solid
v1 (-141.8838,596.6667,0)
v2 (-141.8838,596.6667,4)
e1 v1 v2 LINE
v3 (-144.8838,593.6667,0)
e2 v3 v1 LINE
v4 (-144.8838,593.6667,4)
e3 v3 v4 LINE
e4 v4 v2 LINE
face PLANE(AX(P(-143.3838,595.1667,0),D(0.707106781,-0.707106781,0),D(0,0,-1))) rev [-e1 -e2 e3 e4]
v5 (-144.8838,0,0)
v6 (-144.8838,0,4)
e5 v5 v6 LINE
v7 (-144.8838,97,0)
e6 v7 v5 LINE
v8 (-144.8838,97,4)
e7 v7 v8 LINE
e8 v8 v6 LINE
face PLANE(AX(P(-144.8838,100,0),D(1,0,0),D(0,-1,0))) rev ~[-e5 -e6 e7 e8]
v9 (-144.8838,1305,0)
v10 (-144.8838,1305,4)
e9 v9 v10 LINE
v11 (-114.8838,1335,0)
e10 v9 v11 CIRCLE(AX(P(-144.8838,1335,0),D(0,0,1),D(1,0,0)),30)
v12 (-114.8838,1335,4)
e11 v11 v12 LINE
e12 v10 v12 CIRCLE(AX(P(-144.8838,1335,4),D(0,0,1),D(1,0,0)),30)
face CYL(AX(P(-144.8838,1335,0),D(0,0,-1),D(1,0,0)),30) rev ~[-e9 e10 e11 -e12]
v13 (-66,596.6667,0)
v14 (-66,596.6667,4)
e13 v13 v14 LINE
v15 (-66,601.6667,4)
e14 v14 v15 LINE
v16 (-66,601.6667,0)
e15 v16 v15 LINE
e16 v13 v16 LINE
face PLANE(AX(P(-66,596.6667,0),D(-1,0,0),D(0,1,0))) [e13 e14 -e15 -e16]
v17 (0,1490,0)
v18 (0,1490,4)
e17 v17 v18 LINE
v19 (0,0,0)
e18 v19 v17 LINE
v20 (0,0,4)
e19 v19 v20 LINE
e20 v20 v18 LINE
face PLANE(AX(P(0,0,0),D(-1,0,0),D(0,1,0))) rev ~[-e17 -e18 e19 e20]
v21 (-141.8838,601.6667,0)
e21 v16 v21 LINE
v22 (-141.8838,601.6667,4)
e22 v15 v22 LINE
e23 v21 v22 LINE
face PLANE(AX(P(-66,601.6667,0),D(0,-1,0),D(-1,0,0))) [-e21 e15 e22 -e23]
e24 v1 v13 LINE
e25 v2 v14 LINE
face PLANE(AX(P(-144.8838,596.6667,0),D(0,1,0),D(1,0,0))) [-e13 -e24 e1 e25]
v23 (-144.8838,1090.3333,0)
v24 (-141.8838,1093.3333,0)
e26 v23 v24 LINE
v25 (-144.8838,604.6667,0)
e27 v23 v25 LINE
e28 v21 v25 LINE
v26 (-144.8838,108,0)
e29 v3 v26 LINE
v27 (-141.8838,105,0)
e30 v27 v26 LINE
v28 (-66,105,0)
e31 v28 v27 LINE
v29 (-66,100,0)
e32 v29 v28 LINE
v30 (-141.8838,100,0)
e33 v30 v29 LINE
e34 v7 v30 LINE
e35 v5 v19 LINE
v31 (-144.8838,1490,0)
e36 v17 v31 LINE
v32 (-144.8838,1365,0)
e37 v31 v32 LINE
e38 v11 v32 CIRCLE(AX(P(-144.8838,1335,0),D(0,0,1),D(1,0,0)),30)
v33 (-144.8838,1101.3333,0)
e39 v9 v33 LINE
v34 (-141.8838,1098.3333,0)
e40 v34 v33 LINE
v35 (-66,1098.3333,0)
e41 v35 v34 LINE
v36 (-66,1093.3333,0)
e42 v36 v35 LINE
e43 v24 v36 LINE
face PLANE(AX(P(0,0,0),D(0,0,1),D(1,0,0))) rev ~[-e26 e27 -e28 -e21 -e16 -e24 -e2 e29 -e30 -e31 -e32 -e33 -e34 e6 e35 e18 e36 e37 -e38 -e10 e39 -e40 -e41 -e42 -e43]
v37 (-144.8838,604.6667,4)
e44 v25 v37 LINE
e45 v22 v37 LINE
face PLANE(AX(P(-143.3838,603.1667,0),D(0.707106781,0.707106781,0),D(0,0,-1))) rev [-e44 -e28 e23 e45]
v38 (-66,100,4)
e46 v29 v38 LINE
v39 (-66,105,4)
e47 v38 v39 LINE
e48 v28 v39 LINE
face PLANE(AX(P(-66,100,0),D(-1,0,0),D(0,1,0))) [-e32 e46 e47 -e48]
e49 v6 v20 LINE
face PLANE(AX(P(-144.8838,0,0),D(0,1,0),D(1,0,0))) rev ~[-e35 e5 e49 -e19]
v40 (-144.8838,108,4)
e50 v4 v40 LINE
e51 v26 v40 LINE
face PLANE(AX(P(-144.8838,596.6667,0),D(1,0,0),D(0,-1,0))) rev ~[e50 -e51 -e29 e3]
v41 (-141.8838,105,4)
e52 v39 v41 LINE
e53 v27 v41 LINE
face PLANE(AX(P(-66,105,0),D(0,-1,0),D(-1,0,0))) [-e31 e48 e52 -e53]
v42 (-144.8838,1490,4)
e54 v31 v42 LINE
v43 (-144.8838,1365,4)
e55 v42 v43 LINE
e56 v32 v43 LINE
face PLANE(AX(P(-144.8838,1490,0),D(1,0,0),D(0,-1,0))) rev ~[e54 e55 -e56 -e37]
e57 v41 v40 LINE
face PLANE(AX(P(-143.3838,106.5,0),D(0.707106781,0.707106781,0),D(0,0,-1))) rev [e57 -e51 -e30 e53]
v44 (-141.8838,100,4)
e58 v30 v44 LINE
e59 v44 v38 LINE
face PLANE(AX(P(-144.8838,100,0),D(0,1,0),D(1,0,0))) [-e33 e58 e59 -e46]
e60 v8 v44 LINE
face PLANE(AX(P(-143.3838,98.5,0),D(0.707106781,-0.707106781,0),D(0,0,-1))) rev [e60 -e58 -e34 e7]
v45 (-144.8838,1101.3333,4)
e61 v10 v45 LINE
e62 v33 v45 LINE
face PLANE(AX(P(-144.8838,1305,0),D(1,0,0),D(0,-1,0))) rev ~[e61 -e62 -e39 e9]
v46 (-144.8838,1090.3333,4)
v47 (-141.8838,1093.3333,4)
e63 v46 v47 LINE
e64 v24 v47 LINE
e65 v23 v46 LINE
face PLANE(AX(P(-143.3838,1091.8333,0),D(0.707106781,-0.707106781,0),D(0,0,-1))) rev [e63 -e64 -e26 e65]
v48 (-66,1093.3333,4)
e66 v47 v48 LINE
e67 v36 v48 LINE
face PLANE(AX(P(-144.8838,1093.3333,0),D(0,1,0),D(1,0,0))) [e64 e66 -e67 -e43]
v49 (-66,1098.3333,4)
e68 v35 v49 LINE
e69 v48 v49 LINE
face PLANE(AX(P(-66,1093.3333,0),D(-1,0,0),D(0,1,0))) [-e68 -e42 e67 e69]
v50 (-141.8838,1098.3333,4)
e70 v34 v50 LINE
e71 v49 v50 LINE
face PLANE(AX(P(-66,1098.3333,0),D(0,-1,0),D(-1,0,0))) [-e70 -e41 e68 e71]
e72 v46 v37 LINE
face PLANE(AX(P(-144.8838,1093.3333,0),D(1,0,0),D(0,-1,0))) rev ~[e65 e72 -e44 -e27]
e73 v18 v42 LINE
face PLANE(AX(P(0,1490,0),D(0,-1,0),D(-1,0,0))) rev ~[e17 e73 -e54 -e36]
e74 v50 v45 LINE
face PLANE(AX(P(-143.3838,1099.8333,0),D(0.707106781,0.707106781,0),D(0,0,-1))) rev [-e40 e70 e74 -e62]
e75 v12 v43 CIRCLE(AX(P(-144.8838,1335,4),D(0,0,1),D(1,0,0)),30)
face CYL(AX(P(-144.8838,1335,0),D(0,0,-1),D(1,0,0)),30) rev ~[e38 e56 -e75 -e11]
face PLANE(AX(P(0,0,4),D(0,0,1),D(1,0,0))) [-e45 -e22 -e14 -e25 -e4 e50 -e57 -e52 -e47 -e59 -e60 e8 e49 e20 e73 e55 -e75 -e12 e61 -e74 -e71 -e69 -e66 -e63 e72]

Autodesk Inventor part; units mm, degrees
ref_plane "YZ Plane" through (0, 0, 0) normal (1, 0, 0) x (0, 1, 0)
ref_plane "XZ Plane" through (0, 0, 0) normal (0, 1, 0) x (-1, 0, 0)
ref_plane "XY Plane" through (0, 0, 0) normal (0, 0, 1) x (1, 0, 0)
sketch "Sketch1" plane through (0, 0, 0) normal (0, 0, 1) x (1, 0, 0)
  line L0 (0, 1490) -> (-144.8838, 1490)
  line L1 (-144.8838, 1490) -> (-144.8838, 0)
  line L2 (-144.8838, 0) -> (0, 0)
  line L3 (0, 0) -> (0, 1490)
  line L4 (-144.8838, 100) -> (-66, 100)
  line L5 (-66, 100) -> (-66, 105)
  line L6 (-66, 105) -> (-144.8838, 105)
  line L7 (-144.8838, 105) -> (-144.8838, 100)
  line L8 (-144.8838, 596.6667) -> (-66, 596.6667)
  line L9 (-66, 596.6667) -> (-66, 601.6667)
  line L10 (-66, 601.6667) -> (-144.8838, 601.6667)
  line L11 (-144.8838, 601.6667) -> (-144.8838, 596.6667)
  line L12 (-144.8838, 1093.3333) -> (-66, 1093.3333)
  line L13 (-66, 1093.3333) -> (-66, 1098.3333)
  line L14 (-66, 1098.3333) -> (-144.8838, 1098.3333)
  line L15 (-144.8838, 1098.3333) -> (-144.8838, 1093.3333)
  circle A0 centre (-144.8838, 1335) radius 30
  point P0 (-144.8838, 1098.3333)
  point P1 (-144.8838, 1093.3333)
  point P2 (-144.8838, 105)
  point P3 (-144.8838, 1365)
  point P4 (-144.8838, 1305)
  dimension "d0" = 1490
  dimension "d1" = 144.8838
  dimension "d2" = 5
  dimension "d4" = 100
  dimension "d7" = 496.6667
  dimension "d23" = 66
  dimension "d29" = 60
  dimension "d30" = 1335
extrude "Plate1" add sketch "Sketch1" along normal blind 4 contours L3 L2 L1 L4 L5 L6 L8 L9 L10 L12 L13 L14 A0 L0
chamfer "Corner Chamfer1" distance 3 angle 45 6 edges at (-144.8838, 100, 2) (-144.8838, 105, 2) (-144.8838, 596.6667, 2) (-144.8838, 601.6667, 2) (-144.8838, 1098.3333, 2) (-144.8838, 1093.3333, 2)
equation "\"d0\" = Стрингер_длина"
equation "\"d1\" = стрингер_глубина_5"
equation "\"d2\" = паз_под_стрингер_толщина"
equation "\"d7\" = Шаг_шпангоутов"
equation "\"d23\" = паз_под_стрингер_глубина - Thickness"
equation "\"d29\" = 2 * радиус_выреза_под_сварку"
equation "\"d12\" = Thickness"
equation "\"BendRadius\" = Thickness"
equation "\"BendReliefWidth\" = Thickness"
equation "\"BendReliefDepth\" = 0.5 * Thickness"
equation "\"CornerReliefSize\" = 4 * Thickness"
equation "\"MinimumRemnant\" = 2 * Thickness"
equation "\"TransitionRadius\" = BendRadius"
equation "\"JacobiRadiusSize\" = BendRadius"
equation "\"GapSize\" = Thickness"
equation "\"Стрингер_длина\" = 1490"
equation "\"стрингер_глубина_5\" = 144.883787"
equation "\"паз_под_стрингер_толщина\" = 5"
equation "\"Шаг_шпангоутов\" = 496.666667"
equation "\"паз_под_стрингер_глубина\" = 70"
equation "\"Thickness\" = 4"
equation "\"радиус_выреза_под_сварку\" = 30"
properties part number "0714 GBK stringer C2" material "Steel"
